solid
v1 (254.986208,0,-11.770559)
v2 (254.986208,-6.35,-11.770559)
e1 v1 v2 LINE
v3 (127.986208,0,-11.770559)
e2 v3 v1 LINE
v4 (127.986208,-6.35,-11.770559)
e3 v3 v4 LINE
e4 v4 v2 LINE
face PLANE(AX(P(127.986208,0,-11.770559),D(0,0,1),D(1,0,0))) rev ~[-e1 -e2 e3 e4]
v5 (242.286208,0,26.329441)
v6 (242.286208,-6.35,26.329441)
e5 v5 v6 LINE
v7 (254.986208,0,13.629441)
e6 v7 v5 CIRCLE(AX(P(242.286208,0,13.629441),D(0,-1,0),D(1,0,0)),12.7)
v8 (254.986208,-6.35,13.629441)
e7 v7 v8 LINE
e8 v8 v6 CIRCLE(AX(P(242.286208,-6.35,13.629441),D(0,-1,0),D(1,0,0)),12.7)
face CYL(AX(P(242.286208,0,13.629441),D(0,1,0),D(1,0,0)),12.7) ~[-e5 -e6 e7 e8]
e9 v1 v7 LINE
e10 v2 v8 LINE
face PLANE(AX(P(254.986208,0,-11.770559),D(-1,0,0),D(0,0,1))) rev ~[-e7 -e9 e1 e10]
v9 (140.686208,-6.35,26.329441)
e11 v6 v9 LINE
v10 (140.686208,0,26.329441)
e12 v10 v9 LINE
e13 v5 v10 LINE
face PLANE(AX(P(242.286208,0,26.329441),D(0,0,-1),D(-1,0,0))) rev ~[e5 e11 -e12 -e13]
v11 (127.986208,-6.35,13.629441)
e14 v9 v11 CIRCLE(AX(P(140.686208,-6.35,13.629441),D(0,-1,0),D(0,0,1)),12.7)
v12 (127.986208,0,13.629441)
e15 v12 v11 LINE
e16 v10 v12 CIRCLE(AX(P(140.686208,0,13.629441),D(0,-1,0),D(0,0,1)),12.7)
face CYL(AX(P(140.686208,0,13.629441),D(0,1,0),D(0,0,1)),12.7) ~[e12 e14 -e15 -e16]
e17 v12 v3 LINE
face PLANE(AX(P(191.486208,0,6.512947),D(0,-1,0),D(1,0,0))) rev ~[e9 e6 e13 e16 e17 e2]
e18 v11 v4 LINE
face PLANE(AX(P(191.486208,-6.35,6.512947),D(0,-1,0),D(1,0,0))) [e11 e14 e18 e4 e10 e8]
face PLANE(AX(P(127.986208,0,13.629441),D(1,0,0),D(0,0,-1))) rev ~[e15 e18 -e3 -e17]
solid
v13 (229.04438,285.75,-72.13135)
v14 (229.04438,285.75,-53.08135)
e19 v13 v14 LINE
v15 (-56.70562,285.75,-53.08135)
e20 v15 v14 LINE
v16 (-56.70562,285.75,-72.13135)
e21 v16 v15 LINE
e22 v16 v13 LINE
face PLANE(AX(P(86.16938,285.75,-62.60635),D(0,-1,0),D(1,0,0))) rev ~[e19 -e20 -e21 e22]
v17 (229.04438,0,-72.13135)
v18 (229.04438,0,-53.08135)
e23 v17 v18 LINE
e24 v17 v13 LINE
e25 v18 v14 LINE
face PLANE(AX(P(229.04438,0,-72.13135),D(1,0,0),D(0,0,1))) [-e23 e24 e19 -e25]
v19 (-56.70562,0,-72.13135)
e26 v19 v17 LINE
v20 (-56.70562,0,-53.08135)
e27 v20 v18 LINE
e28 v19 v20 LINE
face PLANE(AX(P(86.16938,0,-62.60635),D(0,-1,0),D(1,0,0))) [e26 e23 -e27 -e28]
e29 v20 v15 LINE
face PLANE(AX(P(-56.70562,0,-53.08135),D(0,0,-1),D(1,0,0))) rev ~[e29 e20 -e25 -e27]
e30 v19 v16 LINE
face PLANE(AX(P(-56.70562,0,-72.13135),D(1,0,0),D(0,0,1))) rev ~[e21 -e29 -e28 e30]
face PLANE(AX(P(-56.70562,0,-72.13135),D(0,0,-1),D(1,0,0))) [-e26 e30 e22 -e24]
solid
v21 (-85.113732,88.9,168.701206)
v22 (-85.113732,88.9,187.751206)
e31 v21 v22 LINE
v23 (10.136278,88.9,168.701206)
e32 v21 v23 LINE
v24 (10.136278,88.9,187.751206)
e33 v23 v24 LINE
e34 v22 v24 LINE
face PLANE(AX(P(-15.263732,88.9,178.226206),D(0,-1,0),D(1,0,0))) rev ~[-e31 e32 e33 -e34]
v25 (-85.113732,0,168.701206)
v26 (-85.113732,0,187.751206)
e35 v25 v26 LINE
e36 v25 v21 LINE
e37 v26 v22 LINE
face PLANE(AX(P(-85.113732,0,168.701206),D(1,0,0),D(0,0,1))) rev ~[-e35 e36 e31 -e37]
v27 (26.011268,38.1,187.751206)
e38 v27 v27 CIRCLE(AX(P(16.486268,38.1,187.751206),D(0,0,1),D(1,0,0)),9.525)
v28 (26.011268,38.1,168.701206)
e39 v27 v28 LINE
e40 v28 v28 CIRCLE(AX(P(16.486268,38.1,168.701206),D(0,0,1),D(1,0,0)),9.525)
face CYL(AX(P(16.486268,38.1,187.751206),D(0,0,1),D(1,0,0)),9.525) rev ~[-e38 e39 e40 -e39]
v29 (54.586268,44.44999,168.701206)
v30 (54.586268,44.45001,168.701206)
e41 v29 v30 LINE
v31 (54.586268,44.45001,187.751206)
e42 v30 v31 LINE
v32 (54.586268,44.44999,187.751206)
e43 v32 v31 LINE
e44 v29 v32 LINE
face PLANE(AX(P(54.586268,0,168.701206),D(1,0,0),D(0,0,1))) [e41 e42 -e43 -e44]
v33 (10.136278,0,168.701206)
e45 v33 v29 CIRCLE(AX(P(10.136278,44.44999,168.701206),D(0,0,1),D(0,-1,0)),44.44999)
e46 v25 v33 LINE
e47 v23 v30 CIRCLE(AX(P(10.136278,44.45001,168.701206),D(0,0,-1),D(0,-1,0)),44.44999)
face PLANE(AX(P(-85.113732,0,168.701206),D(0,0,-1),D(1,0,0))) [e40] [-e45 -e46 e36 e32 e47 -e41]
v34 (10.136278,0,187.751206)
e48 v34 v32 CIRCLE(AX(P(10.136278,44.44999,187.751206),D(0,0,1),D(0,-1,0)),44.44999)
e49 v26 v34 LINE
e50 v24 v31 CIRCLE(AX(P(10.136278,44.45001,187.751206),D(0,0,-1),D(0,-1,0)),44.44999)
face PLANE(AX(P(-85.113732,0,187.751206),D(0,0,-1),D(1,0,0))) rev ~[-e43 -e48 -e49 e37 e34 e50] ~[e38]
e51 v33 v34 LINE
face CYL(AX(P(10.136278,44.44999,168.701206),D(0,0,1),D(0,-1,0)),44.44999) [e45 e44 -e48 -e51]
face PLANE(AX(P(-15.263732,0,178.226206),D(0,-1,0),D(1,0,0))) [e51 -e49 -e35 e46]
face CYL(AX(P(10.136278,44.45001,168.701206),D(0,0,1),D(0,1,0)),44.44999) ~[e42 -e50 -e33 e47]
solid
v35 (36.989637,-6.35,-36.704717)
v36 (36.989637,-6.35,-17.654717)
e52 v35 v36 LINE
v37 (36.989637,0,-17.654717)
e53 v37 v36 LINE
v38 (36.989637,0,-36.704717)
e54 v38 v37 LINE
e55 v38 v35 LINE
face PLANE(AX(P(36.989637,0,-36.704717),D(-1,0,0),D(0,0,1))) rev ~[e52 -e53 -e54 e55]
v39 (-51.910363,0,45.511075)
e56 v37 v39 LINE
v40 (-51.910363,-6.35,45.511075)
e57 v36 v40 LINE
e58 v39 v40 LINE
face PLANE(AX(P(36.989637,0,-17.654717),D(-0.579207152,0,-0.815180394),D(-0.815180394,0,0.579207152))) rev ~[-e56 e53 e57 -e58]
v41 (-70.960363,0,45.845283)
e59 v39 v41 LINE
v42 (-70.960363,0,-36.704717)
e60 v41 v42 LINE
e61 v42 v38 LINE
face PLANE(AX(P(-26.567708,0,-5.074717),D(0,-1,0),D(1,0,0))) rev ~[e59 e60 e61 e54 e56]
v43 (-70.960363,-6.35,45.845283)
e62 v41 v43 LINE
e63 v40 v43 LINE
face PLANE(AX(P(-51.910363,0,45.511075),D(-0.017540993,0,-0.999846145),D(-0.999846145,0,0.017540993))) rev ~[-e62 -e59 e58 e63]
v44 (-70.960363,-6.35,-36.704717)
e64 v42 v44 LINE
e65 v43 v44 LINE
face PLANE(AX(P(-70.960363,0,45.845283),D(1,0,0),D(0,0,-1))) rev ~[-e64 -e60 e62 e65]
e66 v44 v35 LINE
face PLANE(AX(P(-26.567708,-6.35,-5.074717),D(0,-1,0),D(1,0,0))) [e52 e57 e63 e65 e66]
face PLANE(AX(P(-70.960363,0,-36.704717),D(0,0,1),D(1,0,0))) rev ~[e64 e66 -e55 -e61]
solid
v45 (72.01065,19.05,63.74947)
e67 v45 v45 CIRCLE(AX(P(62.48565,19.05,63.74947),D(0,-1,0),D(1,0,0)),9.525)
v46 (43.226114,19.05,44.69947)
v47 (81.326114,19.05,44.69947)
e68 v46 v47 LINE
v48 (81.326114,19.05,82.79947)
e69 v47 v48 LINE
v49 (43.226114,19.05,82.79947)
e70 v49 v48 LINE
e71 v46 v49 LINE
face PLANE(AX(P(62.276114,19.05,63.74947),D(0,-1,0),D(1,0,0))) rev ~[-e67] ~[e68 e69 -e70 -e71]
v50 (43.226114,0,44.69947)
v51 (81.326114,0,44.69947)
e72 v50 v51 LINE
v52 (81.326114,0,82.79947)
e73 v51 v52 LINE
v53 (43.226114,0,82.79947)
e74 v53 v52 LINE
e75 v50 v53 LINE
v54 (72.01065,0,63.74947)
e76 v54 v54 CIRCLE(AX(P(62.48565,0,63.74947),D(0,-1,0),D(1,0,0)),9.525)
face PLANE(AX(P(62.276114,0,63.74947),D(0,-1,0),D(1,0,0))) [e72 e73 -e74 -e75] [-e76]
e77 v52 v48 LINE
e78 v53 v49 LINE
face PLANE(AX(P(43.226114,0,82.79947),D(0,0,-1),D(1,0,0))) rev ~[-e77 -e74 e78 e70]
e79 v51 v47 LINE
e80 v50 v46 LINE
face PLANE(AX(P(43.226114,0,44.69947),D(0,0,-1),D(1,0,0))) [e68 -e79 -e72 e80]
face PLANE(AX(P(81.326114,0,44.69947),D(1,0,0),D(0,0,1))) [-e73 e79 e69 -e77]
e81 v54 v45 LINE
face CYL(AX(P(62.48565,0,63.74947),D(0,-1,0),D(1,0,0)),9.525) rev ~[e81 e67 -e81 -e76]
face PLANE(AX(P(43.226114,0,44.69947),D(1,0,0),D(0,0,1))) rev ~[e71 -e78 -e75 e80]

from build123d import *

# Parameters (mm, degrees)
F1_DEPTH = 6.35
F2_W     = 285.75
F2_H     = 19.05
F3_DEPTH = 285.75
F4_W     = 38.1
F4_H     = 38.1
F4_R     = 9.525
F5_DEPTH = 19.05
F6_W     = 139.7
F6_H     = 19.05
F7_DEPTH = 88.9
F8_R     = 9.525
F9_DEPTH = 76.2
F10_R    = 44.44999


# Not quite as in the source:
# - a fillet or chamfer is up to 0.001 mm smaller than in the source, because OpenCascade refuses the exact size


with BuildPart() as f1:
    # F0 (on Front) → F1 (new body)
    with BuildSketch(Plane.XZ):
        Polygon((-51.910363327, 45.5110752996), (-70.960363327, 45.8452826373), (-70.960363327, -36.7047173627), (36.989636673, -36.7047173627), (36.989636673, -17.6547173627), align=None)
    extrude(amount=F1_DEPTH)


with BuildPart() as f1b:
    # F0 (on Front) → F1, piece 2 (new body)
    with BuildSketch(Plane.XZ):
        with BuildLine():
            ThreePointArc((140.6862076044, 26.3294414565), (131.7059514833, 22.6096975776), (127.9862076044, 13.6294414565))
            Line((127.9862076044, 13.6294414565), (127.9862076044, -11.7705585435))
            Line((127.9862076044, -11.7705585435), (254.9862076044, -11.7705585435))
            Line((254.9862076044, -11.7705585435), (254.9862076044, 13.6294414565))
            ThreePointArc((254.9862076044, 13.6294414565), (251.2664637255, 22.6096975776), (242.2862076044, 26.3294414565))
            Line((242.2862076044, 26.3294414565), (140.6862076044, 26.3294414565))
        make_face()
    extrude(amount=F1_DEPTH)


with BuildPart() as f3:
    # F2 (on Front) → F3 (new body)
    with BuildSketch(Plane.XZ):
        with Locations((86.1693803481, -62.6063495874)):
            Rectangle(F2_W, F2_H)
    extrude(amount=-F3_DEPTH)


with BuildPart() as f5:
    # F4 (on Front) → F5 (new body)
    with BuildSketch(Plane.XZ):
        with Locations((62.2761137784, 63.7494698803)):
            Rectangle(F4_W, F4_H)
        with Locations((62.4856501818, 63.7494698803)):
            Circle(F4_R, mode=Mode.SUBTRACT)
    extrude(amount=-F5_DEPTH)


with BuildPart() as f7:
    # F6 (on Front) → F7 (new body)
    with BuildSketch(Plane.XZ):
        with Locations((-15.2637315914, 178.2262056568)):
            Rectangle(F6_W, F6_H)
    extrude(amount=-F7_DEPTH)

    # F8 (on face) → F9 (cut)
    with BuildSketch(Plane.XY.offset(187.7512056568)):
        with Locations((16.4862684086, 38.1)):
            Circle(F8_R)
    extrude(amount=-F9_DEPTH, mode=Mode.SUBTRACT)

    # F10 (radius 44.45 in the source; OpenCascade refuses exactly that, so slightly less here)
    f10_edges = [f7.edges().sort_by_distance(p)[0] for p in [
        (54.586268, 0, 178.226206),
        (54.586268, 88.9, 178.226206),
    ]]
    fillet(f10_edges, radius=F10_R)


solid = Compound([f1.part, f1b.part, f3.part, f5.part, f7.part])
